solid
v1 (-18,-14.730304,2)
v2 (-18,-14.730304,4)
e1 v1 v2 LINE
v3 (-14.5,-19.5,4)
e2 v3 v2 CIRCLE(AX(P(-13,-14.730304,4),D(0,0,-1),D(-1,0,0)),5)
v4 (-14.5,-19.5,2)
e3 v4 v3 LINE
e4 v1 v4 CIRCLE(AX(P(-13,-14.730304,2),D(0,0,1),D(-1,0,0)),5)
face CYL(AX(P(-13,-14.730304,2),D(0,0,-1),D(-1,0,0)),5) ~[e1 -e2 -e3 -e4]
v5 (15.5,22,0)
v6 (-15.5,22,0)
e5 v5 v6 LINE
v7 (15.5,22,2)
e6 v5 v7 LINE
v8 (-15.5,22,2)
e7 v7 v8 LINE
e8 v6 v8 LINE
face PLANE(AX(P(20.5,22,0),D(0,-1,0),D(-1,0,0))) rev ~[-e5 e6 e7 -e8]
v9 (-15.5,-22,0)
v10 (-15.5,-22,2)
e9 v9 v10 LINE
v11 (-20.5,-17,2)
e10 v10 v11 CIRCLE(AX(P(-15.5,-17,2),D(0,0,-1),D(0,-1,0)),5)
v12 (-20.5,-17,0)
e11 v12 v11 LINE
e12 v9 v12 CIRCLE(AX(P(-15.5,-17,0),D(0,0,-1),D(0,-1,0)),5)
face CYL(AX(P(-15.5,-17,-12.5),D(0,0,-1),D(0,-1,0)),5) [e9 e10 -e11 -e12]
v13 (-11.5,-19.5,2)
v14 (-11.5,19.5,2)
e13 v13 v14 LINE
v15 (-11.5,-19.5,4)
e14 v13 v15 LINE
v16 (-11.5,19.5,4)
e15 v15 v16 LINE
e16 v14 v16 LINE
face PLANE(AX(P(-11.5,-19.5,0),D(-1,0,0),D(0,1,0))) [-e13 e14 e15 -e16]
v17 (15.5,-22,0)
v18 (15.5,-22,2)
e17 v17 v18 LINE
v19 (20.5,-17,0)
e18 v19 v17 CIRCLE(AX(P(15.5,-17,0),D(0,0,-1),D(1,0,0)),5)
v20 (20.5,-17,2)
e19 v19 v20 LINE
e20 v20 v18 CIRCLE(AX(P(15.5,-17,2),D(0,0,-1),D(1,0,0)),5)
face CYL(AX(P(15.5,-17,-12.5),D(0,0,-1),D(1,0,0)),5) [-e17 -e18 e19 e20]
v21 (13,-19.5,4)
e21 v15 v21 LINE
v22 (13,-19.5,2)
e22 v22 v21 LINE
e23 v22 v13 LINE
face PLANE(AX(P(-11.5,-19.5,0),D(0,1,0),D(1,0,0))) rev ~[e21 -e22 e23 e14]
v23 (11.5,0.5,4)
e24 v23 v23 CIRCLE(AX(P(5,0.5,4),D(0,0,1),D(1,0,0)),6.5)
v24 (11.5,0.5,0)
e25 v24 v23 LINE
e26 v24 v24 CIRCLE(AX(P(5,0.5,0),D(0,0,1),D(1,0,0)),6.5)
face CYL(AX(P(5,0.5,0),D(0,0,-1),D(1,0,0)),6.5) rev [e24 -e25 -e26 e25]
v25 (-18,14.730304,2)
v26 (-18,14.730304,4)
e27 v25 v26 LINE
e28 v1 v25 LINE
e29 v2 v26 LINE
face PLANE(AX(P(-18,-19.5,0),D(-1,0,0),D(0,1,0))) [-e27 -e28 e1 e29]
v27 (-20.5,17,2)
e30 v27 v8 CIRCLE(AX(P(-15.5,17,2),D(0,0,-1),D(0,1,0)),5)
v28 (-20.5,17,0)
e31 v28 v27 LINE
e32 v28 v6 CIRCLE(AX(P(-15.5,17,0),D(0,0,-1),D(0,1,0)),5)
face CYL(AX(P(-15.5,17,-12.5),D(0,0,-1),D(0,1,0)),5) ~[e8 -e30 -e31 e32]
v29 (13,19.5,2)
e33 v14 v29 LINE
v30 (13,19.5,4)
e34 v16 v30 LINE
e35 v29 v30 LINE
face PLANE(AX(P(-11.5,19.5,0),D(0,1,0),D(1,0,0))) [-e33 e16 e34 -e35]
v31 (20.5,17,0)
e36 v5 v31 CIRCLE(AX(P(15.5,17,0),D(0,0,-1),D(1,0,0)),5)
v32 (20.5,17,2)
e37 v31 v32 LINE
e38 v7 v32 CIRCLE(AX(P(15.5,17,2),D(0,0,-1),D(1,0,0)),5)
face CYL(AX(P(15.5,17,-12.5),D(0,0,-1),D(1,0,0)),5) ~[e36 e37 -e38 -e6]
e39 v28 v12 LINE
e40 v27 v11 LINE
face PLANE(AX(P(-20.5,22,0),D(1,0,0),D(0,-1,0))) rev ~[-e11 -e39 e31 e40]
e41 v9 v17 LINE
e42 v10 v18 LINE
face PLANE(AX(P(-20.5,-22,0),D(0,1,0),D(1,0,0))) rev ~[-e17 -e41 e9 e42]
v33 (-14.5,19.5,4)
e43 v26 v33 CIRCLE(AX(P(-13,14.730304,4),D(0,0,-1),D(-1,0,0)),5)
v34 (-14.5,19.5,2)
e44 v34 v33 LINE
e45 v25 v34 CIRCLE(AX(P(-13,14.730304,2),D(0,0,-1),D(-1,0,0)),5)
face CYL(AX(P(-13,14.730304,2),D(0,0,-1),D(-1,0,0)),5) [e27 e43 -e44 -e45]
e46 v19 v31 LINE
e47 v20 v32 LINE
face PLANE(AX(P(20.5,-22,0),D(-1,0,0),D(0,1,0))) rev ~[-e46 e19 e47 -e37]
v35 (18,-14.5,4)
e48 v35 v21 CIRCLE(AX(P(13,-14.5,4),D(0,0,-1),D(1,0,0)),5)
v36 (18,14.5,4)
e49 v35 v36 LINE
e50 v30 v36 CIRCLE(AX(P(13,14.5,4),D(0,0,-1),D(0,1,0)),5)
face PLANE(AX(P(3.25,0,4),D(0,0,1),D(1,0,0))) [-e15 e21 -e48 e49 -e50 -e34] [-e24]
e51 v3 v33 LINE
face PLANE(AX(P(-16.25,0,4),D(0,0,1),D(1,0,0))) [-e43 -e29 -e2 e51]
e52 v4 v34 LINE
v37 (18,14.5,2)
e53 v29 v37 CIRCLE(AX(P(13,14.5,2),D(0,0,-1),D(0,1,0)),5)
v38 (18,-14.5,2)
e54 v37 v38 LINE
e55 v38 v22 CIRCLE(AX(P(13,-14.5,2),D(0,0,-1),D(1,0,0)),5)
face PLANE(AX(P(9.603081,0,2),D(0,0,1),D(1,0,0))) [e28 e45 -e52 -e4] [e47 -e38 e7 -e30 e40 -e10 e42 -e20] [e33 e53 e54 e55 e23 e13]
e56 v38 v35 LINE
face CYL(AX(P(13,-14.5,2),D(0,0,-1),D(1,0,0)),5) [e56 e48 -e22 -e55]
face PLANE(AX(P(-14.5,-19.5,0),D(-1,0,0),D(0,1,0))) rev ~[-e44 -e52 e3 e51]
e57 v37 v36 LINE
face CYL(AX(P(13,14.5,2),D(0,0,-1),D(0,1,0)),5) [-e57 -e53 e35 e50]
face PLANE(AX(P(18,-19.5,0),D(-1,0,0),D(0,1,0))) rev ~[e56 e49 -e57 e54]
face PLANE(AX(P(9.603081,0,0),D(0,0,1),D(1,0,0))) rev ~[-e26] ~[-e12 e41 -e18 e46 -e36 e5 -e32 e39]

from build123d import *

# Parameters (mm, degrees)
F0_W        = 3
F0_H        = 2.5
F0_H_2      = 39
F1_DEPTH    = 2
F0_W_2      = 3.5
F0_W_3      = 29.5
F0_R        = 6.5
F2_DEPTH    = 4
F3_T1_DEPTH = 13.9242400177
F3_T3_DEPTH = 14.5
F3_T5_DEPTH = 27


# Not quite as in the source:
# - a fillet or chamfer that OpenCascade refuses, or shapes differently, is made with other operations: its cross-section is extruded or revolved along the edge and cut away or added


with BuildPart() as f1:
    # F0 (on Top) → F1 (new body)
    with BuildSketch(Plane.XY):
        Polygon((20.5, -22), (20.5, 22), (-11.5, 22), (-11.5, 19.5), (18, 19.5), (18, -19.5), (-11.5, -19.5), (-11.5, -22), align=None)
        with Locations((-13, 20.75)):
            Rectangle(F0_W, F0_H)
        Polygon((-14.5, 19.5), (-14.5, 22), (-20.5, 22), (-20.5, -22), (-14.5, -22), (-14.5, -19.5), (-18, -19.5), (-18, 19.5), align=None)
        with Locations((-13, -20.75)):
            Rectangle(F0_W, F0_H)
        with Locations((-13, 0)):
            Rectangle(F0_W, F0_H_2)
    extrude(amount=F1_DEPTH)

    # F0 (on Top) → F2 (join)
    with BuildSketch(Plane.XY):
        with Locations((-16.25, 0)):
            Rectangle(F0_W_2, F0_H_2)
        with Locations((3.25, 0)):
            Rectangle(F0_W_3, F0_H_2)
        with Locations((5, 0.5)):
            Circle(F0_R, mode=Mode.SUBTRACT)
    extrude(amount=F2_DEPTH)

    # F3: fillet of radius 5 on 8 edges, made by hand

    # F3_s2 → F3_t1 (cut)
    with BuildSketch(Plane.XY.offset(2)):
        with BuildLine():
            ThreePointArc((-18, 14.7303039929), (-17.0311288741, 17.6883438845), (-14.5, 19.5))
            Line((-14.5, 19.5), (-18, 19.5))
            Line((-18, 19.5), (-18, 14.7303039929))
        make_face()
        with BuildLine():
            ThreePointArc((-18, -14.7303039929), (-17.0311288741, -17.6883438845), (-14.5, -19.5))
            Line((-14.5, -19.5), (-18, -19.5))
            Line((-18, -19.5), (-18, -14.7303039929))
        make_face()
    extrude(amount=F3_T1_DEPTH, mode=Mode.SUBTRACT)

    # F3_s4 → F3_t3 (cut)
    with BuildSketch(Plane.XY.offset(2)):
        with BuildLine():
            ThreePointArc((13, 19.5), (16.5355339059, 18.0355339059), (18, 14.5))
            Line((18, 14.5), (18, 19.5))
            Line((18, 19.5), (13, 19.5))
        make_face()
        with BuildLine():
            ThreePointArc((18, -14.5), (16.5355339059, -18.0355339059), (13, -19.5))
            Line((13, -19.5), (18, -19.5))
            Line((18, -19.5), (18, -14.5))
        make_face()
    extrude(amount=F3_T3_DEPTH, mode=Mode.SUBTRACT)

    # F3_s6 → F3_t5 (cut)
    with BuildSketch(Plane.XY.offset(-12.5)):
        with BuildLine():
            ThreePointArc((-15.5, 22), (-19.0355339059, 20.5355339059), (-20.5, 17))
            Line((-20.5, 17), (-20.5, 22))
            Line((-20.5, 22), (-15.5, 22))
        make_face()
        with BuildLine():
            ThreePointArc((-15.5, -22), (-19.0355339059, -20.5355339059), (-20.5, -17))
            Line((-20.5, -17), (-20.5, -22))
            Line((-20.5, -22), (-15.5, -22))
        make_face()
        with BuildLine():
            ThreePointArc((20.5, 17), (19.0355339059, 20.5355339059), (15.5, 22))
            Line((15.5, 22), (20.5, 22))
            Line((20.5, 22), (20.5, 17))
        make_face()
        with BuildLine():
            ThreePointArc((20.5, -17), (19.0355339059, -20.5355339059), (15.5, -22))
            Line((15.5, -22), (20.5, -22))
            Line((20.5, -22), (20.5, -17))
        make_face()
    extrude(amount=F3_T5_DEPTH, mode=Mode.SUBTRACT)


solid = f1.part
